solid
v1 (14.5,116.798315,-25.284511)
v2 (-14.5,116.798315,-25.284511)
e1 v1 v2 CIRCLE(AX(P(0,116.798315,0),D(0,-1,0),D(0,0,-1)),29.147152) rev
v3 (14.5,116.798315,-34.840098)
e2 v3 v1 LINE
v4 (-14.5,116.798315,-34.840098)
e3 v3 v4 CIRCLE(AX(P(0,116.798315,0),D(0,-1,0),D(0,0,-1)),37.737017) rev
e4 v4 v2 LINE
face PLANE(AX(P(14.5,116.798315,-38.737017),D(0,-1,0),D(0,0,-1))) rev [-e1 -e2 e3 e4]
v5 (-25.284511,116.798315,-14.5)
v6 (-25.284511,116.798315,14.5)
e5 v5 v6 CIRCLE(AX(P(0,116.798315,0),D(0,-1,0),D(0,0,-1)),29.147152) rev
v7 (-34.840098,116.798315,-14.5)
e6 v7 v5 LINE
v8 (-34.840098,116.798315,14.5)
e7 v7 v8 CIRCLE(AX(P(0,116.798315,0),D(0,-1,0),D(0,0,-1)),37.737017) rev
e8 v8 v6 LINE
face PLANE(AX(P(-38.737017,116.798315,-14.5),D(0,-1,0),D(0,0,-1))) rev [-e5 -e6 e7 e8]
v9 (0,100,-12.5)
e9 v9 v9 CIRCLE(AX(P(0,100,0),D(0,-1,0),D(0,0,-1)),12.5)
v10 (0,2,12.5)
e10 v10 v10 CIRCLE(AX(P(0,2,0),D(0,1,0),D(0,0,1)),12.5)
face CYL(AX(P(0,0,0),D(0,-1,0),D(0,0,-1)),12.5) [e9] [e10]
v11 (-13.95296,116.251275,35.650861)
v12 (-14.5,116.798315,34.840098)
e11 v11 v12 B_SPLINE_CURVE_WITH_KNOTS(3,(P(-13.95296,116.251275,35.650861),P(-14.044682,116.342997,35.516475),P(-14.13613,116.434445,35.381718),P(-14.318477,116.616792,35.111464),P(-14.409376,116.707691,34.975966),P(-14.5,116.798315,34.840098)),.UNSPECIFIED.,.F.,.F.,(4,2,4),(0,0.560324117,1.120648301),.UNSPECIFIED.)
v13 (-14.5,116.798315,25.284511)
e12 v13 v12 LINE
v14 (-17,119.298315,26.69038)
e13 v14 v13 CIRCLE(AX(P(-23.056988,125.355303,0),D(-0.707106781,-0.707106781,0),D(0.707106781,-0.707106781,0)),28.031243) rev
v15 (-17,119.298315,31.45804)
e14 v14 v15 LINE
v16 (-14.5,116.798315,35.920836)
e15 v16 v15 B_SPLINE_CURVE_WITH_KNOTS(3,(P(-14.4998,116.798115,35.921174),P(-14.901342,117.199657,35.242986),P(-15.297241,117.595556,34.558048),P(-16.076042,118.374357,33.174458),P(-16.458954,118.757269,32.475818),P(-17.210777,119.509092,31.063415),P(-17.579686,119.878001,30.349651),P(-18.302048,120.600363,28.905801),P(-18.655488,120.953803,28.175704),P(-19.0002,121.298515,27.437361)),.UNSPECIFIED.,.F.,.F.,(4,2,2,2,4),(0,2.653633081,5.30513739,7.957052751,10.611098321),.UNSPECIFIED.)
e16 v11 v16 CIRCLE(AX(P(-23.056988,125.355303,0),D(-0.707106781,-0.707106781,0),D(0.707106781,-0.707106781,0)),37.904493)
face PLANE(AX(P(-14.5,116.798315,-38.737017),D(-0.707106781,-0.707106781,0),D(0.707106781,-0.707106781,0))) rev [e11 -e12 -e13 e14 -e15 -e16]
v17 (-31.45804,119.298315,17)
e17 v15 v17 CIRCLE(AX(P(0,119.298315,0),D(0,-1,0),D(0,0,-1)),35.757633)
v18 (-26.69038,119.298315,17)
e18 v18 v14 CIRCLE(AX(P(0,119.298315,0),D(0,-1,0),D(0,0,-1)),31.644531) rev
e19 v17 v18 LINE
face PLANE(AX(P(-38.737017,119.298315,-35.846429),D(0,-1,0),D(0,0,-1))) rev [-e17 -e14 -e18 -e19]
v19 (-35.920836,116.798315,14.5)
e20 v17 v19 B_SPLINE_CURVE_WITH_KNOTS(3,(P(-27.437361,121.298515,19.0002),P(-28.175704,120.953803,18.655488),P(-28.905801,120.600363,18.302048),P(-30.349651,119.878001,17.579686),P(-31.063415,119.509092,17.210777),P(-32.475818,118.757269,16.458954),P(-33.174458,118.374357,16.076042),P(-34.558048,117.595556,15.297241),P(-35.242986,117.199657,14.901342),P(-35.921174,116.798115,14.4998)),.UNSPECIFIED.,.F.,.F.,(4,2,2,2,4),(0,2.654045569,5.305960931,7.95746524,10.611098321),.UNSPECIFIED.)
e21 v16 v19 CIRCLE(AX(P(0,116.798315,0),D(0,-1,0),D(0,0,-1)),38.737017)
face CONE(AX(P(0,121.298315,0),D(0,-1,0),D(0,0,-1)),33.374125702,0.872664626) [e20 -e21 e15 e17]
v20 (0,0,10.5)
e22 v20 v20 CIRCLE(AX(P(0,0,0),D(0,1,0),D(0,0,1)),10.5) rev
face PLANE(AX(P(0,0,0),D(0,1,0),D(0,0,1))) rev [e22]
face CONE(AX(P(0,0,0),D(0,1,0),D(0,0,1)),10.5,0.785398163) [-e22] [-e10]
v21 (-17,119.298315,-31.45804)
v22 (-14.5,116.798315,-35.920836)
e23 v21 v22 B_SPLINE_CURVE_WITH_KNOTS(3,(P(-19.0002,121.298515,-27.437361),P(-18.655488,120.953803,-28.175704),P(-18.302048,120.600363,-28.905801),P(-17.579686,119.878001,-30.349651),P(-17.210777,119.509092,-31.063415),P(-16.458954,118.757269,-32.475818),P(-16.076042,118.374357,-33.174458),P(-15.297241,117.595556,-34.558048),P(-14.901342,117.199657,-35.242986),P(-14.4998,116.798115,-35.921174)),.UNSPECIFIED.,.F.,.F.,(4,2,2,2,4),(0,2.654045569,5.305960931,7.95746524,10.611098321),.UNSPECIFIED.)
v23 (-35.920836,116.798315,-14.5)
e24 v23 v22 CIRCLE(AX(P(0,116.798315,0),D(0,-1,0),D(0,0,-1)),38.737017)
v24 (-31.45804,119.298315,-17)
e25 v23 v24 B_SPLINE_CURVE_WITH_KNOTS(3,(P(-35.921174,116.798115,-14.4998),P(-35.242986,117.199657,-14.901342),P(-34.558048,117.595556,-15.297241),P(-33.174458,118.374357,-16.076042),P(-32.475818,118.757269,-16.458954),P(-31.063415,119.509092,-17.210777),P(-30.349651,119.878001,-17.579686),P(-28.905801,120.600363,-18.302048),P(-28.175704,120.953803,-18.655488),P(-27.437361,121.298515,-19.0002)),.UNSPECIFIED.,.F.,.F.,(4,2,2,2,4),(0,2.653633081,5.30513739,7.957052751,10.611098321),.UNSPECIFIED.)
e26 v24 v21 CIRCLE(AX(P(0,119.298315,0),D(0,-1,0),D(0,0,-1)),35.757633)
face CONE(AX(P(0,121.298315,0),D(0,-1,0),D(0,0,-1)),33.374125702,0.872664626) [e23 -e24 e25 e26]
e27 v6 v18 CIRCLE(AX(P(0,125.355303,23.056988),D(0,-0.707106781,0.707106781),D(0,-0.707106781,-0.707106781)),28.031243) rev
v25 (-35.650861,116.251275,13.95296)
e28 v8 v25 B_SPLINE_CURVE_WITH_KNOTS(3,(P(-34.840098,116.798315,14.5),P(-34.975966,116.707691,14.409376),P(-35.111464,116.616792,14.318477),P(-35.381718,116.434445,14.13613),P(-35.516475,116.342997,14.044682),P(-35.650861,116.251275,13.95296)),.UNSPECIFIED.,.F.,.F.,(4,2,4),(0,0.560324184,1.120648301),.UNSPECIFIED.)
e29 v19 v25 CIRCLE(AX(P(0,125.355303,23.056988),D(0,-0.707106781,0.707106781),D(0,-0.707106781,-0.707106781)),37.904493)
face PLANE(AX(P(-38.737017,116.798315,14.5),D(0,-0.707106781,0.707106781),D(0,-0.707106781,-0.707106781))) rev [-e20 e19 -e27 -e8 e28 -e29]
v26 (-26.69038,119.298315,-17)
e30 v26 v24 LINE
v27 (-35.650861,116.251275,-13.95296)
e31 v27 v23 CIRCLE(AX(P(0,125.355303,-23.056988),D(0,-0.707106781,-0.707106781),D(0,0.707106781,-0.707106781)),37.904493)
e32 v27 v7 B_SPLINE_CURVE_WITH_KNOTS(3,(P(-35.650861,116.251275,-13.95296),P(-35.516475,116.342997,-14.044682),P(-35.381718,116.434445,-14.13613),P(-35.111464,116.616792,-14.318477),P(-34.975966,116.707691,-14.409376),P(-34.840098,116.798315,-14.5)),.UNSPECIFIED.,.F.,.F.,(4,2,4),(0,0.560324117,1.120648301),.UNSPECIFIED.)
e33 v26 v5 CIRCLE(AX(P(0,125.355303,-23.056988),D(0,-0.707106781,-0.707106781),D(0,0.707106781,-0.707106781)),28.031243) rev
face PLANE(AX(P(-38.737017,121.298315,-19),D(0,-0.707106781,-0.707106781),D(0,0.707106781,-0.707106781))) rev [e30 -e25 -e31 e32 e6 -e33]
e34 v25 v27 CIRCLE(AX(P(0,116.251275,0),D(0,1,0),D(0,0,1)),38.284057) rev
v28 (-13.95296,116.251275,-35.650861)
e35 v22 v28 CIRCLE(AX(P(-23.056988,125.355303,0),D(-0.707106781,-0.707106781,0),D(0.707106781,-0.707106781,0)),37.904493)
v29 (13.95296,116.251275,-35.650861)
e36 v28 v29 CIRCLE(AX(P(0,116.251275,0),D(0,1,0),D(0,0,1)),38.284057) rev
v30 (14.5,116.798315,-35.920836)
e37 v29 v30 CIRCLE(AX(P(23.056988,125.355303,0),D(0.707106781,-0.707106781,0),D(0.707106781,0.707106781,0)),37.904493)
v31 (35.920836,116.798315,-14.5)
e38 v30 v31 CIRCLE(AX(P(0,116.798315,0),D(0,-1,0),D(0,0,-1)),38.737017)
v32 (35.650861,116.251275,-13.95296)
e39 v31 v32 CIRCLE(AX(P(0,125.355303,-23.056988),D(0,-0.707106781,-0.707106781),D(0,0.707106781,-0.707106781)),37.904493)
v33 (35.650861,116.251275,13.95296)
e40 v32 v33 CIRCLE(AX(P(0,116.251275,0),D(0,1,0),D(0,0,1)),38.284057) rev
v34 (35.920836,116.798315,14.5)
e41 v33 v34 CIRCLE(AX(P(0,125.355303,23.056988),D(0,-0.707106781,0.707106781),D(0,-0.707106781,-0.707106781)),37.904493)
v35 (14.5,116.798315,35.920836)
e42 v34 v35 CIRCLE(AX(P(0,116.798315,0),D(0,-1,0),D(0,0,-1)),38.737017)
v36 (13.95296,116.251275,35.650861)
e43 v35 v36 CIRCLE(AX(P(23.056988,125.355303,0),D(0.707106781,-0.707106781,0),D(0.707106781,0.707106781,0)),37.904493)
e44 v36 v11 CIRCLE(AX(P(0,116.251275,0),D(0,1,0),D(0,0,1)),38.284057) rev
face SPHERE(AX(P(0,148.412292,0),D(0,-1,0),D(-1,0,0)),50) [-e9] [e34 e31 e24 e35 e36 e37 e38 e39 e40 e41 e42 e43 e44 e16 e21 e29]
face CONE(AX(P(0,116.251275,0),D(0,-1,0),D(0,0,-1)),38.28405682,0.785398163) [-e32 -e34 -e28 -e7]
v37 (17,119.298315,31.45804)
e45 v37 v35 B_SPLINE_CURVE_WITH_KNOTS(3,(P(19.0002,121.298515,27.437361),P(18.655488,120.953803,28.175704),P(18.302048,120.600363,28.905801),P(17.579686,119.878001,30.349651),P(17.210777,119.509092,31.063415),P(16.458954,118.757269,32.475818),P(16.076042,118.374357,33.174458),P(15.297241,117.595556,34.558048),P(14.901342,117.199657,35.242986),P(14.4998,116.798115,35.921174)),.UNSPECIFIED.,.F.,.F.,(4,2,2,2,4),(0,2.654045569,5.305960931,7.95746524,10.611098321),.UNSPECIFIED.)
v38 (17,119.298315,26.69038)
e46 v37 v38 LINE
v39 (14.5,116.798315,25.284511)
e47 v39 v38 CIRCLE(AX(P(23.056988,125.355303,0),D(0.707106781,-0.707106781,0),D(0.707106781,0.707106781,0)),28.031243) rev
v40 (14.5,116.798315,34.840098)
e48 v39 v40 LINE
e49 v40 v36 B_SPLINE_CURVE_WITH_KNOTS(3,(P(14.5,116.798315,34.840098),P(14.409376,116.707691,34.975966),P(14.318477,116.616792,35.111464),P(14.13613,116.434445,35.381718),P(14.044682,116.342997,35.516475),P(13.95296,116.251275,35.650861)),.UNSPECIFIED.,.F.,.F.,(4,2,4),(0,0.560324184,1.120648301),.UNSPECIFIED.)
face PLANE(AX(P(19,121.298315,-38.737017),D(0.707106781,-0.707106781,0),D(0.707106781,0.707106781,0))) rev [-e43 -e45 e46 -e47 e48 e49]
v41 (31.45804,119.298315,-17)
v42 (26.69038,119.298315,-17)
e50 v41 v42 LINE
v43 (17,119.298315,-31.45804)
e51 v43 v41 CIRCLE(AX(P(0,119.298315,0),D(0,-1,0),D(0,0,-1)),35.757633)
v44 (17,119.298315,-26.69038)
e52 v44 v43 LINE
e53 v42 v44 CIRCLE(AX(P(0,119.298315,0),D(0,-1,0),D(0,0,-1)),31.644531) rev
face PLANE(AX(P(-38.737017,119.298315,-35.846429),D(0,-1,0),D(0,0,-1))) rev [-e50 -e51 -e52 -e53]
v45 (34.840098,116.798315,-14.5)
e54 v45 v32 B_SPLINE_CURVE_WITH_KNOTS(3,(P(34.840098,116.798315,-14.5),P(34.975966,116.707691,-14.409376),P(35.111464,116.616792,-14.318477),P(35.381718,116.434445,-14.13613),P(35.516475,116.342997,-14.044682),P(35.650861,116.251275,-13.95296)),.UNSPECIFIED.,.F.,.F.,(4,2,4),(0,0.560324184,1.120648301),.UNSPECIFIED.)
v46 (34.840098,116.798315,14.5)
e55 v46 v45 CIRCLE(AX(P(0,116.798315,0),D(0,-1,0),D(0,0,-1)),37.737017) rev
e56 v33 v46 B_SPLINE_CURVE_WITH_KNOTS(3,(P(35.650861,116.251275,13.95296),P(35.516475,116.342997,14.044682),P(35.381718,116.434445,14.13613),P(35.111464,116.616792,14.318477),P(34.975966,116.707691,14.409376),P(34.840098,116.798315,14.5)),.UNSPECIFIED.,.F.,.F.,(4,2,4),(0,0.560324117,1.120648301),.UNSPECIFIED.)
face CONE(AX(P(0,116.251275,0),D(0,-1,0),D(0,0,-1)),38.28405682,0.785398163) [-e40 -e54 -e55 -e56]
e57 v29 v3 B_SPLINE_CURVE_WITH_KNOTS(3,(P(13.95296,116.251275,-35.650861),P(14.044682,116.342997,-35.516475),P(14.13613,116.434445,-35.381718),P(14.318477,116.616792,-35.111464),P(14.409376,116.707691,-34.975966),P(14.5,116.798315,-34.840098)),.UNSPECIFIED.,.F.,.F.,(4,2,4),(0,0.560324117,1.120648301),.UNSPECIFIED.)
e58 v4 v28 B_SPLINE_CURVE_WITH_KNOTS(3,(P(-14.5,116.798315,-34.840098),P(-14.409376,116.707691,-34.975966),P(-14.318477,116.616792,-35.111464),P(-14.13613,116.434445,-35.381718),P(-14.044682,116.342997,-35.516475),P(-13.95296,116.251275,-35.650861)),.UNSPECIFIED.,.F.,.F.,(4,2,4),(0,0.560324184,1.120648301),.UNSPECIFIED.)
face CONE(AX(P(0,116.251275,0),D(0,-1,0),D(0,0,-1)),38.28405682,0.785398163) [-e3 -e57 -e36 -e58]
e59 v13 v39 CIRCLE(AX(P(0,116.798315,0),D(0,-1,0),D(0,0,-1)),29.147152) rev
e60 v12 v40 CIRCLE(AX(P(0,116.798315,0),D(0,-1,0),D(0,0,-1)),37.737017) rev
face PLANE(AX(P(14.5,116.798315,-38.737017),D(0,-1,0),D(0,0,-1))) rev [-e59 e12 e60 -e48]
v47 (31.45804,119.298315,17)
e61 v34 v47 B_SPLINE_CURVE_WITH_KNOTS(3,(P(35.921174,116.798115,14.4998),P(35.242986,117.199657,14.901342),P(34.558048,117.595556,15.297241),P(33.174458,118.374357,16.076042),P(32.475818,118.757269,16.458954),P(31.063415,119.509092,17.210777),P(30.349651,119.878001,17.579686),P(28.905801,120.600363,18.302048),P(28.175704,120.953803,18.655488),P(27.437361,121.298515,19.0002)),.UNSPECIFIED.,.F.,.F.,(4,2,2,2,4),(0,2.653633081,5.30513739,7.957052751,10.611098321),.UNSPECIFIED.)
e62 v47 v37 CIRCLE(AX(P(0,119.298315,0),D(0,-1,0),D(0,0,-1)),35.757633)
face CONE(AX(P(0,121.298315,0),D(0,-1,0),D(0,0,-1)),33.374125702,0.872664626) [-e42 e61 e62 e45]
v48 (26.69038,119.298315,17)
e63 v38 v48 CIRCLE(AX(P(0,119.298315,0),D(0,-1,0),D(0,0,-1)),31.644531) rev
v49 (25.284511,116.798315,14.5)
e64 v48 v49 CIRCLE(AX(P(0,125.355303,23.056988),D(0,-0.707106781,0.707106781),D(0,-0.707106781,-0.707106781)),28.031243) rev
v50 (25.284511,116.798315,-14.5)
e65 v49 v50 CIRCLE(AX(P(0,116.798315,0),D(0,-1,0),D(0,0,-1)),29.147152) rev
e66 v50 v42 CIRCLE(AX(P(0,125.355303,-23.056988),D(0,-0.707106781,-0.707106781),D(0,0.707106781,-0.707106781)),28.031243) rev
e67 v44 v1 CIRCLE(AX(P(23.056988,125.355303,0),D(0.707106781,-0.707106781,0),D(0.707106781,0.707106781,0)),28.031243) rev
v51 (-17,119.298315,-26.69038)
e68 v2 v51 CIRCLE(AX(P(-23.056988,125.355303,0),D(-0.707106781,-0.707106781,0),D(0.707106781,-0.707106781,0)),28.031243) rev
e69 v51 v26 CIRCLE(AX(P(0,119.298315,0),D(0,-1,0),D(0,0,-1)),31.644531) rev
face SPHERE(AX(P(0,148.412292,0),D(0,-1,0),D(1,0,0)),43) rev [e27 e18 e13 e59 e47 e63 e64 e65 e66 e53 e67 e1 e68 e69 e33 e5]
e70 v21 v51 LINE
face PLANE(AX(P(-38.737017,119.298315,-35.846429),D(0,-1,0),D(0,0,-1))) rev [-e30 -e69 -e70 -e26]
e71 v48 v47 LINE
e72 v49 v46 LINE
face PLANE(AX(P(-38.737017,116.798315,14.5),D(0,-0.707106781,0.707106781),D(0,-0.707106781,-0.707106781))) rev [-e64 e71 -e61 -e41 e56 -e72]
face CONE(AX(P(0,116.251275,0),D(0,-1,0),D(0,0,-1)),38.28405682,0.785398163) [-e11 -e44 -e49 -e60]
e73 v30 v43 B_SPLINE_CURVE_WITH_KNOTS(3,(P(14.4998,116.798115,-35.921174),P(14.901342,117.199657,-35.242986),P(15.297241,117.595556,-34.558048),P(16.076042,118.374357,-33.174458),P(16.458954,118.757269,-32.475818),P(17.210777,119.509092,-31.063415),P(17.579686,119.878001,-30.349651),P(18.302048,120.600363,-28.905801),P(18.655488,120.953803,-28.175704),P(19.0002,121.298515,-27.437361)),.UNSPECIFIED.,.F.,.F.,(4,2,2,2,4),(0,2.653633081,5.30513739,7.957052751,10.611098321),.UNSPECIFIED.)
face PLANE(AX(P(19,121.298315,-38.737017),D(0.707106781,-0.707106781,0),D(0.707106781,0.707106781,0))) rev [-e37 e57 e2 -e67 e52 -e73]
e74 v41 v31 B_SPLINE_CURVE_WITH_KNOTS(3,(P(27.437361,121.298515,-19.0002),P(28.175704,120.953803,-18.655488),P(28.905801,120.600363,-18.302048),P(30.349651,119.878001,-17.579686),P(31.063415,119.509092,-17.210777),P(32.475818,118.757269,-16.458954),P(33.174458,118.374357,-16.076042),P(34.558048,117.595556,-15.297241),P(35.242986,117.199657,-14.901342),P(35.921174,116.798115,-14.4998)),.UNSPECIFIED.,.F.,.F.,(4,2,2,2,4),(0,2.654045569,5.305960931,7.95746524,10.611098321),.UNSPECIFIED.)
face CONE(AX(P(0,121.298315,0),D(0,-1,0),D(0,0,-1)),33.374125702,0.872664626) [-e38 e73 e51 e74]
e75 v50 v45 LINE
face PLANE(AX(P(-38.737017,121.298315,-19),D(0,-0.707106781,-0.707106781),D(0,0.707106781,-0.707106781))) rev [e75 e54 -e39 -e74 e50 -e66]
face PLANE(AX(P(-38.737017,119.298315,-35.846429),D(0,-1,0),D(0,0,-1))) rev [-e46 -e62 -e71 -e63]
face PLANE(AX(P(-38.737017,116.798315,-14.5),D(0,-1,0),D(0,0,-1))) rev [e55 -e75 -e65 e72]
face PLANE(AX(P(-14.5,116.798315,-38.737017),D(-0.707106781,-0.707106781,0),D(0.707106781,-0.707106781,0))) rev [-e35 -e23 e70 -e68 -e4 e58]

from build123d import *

# Parameters (mm, degrees)
CUT_EXTRUDE1_DEPTH      = 134.095432677
CIRPATTERN1_COUNT       = 2
CIRPATTERN1_ANGLE       = 90
CUT_EXTRUDE2_DEPTH      = 134.095432677
CUT_EXTRUDE2_DEPTH_BACK = 134.095432677
SKETCH4_W               = 71.692857504
SKETCH4_H               = 7.538034042
CHAMFER1_SIZE           = 1
CHAMFER2_SIZE           = 2


with BuildPart() as part:
    # Sketch2 → Revolve1 (revolve)
    with BuildSketch(Plane.XY, mode=Mode.PRIVATE) as revolve1_sk:
        with BuildLine():
            Line((0, 0), (-12.5, 0))
            Line((-12.5, 0), (-12.5, 100))
            ThreePointArc((-12.5, 100), (-26.960226668, 106.303549529), (-38.737016869, 116.798315107))
            Line((-38.737016869, 116.798315107), (-33.374125702, 121.298315107))
            ThreePointArc((-33.374125702, 121.298315107), (-18.481057884, 109.586391973), (0, 105.412291828))
            Line((0, 105.412291828), (0, 0))
        make_face()
    revolve(revolve1_sk.sketch.rotate(Axis((0, 0, 0), (0, 1, 0)), 270), axis=Axis((0, 0, 0), (0, 1, 0)))

    # Sketch3 → Cut-Extrude1 (cut, symmetric)
    with BuildSketch(Plane(origin=(0, 0, 0), x_dir=(0, 0, -1), z_dir=(1, 0, 0))):
        Polygon((-19, 121.298315107), (19, 121.298315107), (14.5, 116.798315107), (-14.5, 116.798315107), align=None)
    cut_extrude1 = extrude(amount=CUT_EXTRUDE1_DEPTH, both=True, mode=Mode.SUBTRACT)

    # CirPattern1: Cut-Extrude1 ×2 about axis
    cirpattern1_axis = Axis((0, 0, 0), (0, 1, 0))
    for i in range(1, CIRPATTERN1_COUNT):
        add(cut_extrude1.rotate(cirpattern1_axis, i * CIRPATTERN1_ANGLE / (CIRPATTERN1_COUNT - 1)), mode=Mode.SUBTRACT)

    # Sketch4 → Cut-Extrude2 (cut, two sides: drawn at the far end of the back side and taken through both)
    with BuildSketch(Plane(origin=(0, 0, 0), x_dir=(0, 0, -1), z_dir=(1, 0, 0)).offset(-CUT_EXTRUDE2_DEPTH_BACK)):
        with Locations((0, 123.067332128)):
            Rectangle(SKETCH4_W, SKETCH4_H)
    extrude(amount=CUT_EXTRUDE2_DEPTH + CUT_EXTRUDE2_DEPTH_BACK, mode=Mode.SUBTRACT)

    # Chamfer1
    # the kernel refuses this chamfer: 1, 0.710722016 mm, written as the material it takes off along each edge
    with BuildSketch(Plane(origin=(0, 116.798315107, 0), x_dir=(-0.900422371239431, 0, -0.43501672769166055), z_dir=(0.43501672769166055, 0, -0.900422371239431))) as chamfer1_piece_1_section:
        with BuildLine():
            Line((38.28405682, -0.547039951), (38.737016869 - CHAMFER1_SIZE, 0))
            Line((38.737016869 - CHAMFER1_SIZE, 0), (38.737016869, 0))
            ThreePointArc((38.737016869, 0), (38.510313841, -0.275766581), (38.28405682, -0.547039951))
        make_face()
    chamfer1_piece_1 = revolve(axis=Axis((0, 116.798315107, 0), (0, 1, 0)), revolution_arc=51.572716584, mode=Mode.PRIVATE)
    chamfer1_piece_1 = split(chamfer1_piece_1, bisect_by=Plane(origin=(0, 109.548315107, -7.25), z_dir=(0, 0.7071067811865445, 0.7071067811865507)), keep=Keep.TOP, mode=Mode.PRIVATE)
    chamfer1_piece_1 = split(chamfer1_piece_1, bisect_by=Plane(origin=(0, 109.548315107, 7.25), z_dir=(0, 0.7071067811865445, -0.7071067811865507)), keep=Keep.TOP, mode=Mode.PRIVATE)
    add(chamfer1_piece_1, mode=Mode.SUBTRACT)
    with BuildSketch(Plane(origin=(0, 116.798315107, 0), x_dir=(0.9004223712394364, 0, 0.4350167276916494), z_dir=(-0.4350167276916494, 0, 0.9004223712394364))) as chamfer1_piece_2_section:
        with BuildLine():
            Line((38.28405682, -0.547039951), (38.737016869 - CHAMFER1_SIZE, 0))
            Line((38.737016869 - CHAMFER1_SIZE, 0), (38.737016869, 0))
            ThreePointArc((38.737016869, 0), (38.510313841, -0.275766581), (38.28405682, -0.547039951))
        make_face()
    chamfer1_piece_2 = revolve(axis=Axis((0, 116.798315107, 0), (0, 1, 0)), revolution_arc=51.572716584, mode=Mode.PRIVATE)
    chamfer1_piece_2 = split(chamfer1_piece_2, bisect_by=Plane(origin=(0, 109.548315107, 7.25), z_dir=(0, 0.7071067811865445, -0.7071067811865507)), keep=Keep.TOP, mode=Mode.PRIVATE)
    chamfer1_piece_2 = split(chamfer1_piece_2, bisect_by=Plane(origin=(0, 109.548315107, -7.25), z_dir=(0, 0.7071067811865445, 0.7071067811865507)), keep=Keep.TOP, mode=Mode.PRIVATE)
    add(chamfer1_piece_2, mode=Mode.SUBTRACT)
    with BuildSketch(Plane(origin=(0, 116.798315107, 0), x_dir=(-0.43501672769166544, 0, 0.9004223712394286), z_dir=(-0.9004223712394286, 0, -0.43501672769166544))) as chamfer1_piece_3_section:
        with BuildLine():
            Line((38.28405682, -0.547039951), (38.737016869 - CHAMFER1_SIZE, 0))
            Line((38.737016869 - CHAMFER1_SIZE, 0), (38.737016869, 0))
            ThreePointArc((38.737016869, 0), (38.510313841, -0.275766581), (38.28405682, -0.547039951))
        make_face()
    chamfer1_piece_3 = revolve(axis=Axis((0, 116.798315107, 0), (0, 1, 0)), revolution_arc=51.572716584, mode=Mode.PRIVATE)
    chamfer1_piece_3 = split(chamfer1_piece_3, bisect_by=Plane(origin=(-7.25, 109.548315107, 0), z_dir=(0.7071067811865507, 0.7071067811865445, -2.5121479338940513e-15)), keep=Keep.TOP, mode=Mode.PRIVATE)
    chamfer1_piece_3 = split(chamfer1_piece_3, bisect_by=Plane(origin=(7.25, 109.548315107, 0), z_dir=(-0.7071067811865507, 0.7071067811865445, 2.5121479338940513e-15)), keep=Keep.TOP, mode=Mode.PRIVATE)
    add(chamfer1_piece_3, mode=Mode.SUBTRACT)
    with BuildSketch(Plane(origin=(0, 116.798315107, 0), x_dir=(0.4350124309167343, 0, -0.9004244471069814), z_dir=(0.9004244471069814, 0, 0.4350124309167343))) as chamfer1_piece_4_section:
        with BuildLine():
            Line((38.28405682, -0.547039951), (38.737016869 - CHAMFER1_SIZE, 0))
            Line((38.737016869 - CHAMFER1_SIZE, 0), (38.737016869, 0))
            ThreePointArc((38.737016869, 0), (38.510313841, -0.275766581), (38.28405682, -0.547039951))
        make_face()
    chamfer1_piece_4 = revolve(axis=Axis((0, 116.798315107, 0), (0, 1, 0)), revolution_arc=25.786084879, mode=Mode.PRIVATE)
    chamfer1_piece_4 = split(chamfer1_piece_4, bisect_by=Plane(origin=(7.25, 109.548315107, 0), z_dir=(-0.7071067811865507, 0.7071067811865445, 2.5121479338940513e-15)), keep=Keep.TOP, mode=Mode.PRIVATE)
    add(chamfer1_piece_4, mode=Mode.SUBTRACT)
    with BuildSketch(Plane(origin=(0, 116.798315107, 0), x_dir=(0, 0, -1), z_dir=(1, 0, 0))) as chamfer1_piece_5_section:
        with BuildLine():
            Line((38.28405682, -0.547039951), (38.737016869 - CHAMFER1_SIZE, 0))
            Line((38.737016869 - CHAMFER1_SIZE, 0), (38.737016869, 0))
            ThreePointArc((38.737016869, 0), (38.510313841, -0.275766581), (38.28405682, -0.547039951))
        make_face()
    chamfer1_piece_5 = revolve(axis=Axis((0, 116.798315107, 0), (0, 1, 0)), revolution_arc=25.786084879, mode=Mode.PRIVATE)
    chamfer1_piece_5 = split(chamfer1_piece_5, bisect_by=Plane(origin=(-7.25, 109.548315107, 0), z_dir=(0.7071067811865507, 0.7071067811865445, -2.5121479338940513e-15)), keep=Keep.TOP, mode=Mode.PRIVATE)
    add(chamfer1_piece_5, mode=Mode.SUBTRACT)

    # Chamfer2
    chamfer2_edges = [part.edges().sort_by_distance(p)[0] for p in [
        (0, 0, 12.5),
    ]]
    chamfer(chamfer2_edges, length=CHAMFER2_SIZE)


solid = part.part
